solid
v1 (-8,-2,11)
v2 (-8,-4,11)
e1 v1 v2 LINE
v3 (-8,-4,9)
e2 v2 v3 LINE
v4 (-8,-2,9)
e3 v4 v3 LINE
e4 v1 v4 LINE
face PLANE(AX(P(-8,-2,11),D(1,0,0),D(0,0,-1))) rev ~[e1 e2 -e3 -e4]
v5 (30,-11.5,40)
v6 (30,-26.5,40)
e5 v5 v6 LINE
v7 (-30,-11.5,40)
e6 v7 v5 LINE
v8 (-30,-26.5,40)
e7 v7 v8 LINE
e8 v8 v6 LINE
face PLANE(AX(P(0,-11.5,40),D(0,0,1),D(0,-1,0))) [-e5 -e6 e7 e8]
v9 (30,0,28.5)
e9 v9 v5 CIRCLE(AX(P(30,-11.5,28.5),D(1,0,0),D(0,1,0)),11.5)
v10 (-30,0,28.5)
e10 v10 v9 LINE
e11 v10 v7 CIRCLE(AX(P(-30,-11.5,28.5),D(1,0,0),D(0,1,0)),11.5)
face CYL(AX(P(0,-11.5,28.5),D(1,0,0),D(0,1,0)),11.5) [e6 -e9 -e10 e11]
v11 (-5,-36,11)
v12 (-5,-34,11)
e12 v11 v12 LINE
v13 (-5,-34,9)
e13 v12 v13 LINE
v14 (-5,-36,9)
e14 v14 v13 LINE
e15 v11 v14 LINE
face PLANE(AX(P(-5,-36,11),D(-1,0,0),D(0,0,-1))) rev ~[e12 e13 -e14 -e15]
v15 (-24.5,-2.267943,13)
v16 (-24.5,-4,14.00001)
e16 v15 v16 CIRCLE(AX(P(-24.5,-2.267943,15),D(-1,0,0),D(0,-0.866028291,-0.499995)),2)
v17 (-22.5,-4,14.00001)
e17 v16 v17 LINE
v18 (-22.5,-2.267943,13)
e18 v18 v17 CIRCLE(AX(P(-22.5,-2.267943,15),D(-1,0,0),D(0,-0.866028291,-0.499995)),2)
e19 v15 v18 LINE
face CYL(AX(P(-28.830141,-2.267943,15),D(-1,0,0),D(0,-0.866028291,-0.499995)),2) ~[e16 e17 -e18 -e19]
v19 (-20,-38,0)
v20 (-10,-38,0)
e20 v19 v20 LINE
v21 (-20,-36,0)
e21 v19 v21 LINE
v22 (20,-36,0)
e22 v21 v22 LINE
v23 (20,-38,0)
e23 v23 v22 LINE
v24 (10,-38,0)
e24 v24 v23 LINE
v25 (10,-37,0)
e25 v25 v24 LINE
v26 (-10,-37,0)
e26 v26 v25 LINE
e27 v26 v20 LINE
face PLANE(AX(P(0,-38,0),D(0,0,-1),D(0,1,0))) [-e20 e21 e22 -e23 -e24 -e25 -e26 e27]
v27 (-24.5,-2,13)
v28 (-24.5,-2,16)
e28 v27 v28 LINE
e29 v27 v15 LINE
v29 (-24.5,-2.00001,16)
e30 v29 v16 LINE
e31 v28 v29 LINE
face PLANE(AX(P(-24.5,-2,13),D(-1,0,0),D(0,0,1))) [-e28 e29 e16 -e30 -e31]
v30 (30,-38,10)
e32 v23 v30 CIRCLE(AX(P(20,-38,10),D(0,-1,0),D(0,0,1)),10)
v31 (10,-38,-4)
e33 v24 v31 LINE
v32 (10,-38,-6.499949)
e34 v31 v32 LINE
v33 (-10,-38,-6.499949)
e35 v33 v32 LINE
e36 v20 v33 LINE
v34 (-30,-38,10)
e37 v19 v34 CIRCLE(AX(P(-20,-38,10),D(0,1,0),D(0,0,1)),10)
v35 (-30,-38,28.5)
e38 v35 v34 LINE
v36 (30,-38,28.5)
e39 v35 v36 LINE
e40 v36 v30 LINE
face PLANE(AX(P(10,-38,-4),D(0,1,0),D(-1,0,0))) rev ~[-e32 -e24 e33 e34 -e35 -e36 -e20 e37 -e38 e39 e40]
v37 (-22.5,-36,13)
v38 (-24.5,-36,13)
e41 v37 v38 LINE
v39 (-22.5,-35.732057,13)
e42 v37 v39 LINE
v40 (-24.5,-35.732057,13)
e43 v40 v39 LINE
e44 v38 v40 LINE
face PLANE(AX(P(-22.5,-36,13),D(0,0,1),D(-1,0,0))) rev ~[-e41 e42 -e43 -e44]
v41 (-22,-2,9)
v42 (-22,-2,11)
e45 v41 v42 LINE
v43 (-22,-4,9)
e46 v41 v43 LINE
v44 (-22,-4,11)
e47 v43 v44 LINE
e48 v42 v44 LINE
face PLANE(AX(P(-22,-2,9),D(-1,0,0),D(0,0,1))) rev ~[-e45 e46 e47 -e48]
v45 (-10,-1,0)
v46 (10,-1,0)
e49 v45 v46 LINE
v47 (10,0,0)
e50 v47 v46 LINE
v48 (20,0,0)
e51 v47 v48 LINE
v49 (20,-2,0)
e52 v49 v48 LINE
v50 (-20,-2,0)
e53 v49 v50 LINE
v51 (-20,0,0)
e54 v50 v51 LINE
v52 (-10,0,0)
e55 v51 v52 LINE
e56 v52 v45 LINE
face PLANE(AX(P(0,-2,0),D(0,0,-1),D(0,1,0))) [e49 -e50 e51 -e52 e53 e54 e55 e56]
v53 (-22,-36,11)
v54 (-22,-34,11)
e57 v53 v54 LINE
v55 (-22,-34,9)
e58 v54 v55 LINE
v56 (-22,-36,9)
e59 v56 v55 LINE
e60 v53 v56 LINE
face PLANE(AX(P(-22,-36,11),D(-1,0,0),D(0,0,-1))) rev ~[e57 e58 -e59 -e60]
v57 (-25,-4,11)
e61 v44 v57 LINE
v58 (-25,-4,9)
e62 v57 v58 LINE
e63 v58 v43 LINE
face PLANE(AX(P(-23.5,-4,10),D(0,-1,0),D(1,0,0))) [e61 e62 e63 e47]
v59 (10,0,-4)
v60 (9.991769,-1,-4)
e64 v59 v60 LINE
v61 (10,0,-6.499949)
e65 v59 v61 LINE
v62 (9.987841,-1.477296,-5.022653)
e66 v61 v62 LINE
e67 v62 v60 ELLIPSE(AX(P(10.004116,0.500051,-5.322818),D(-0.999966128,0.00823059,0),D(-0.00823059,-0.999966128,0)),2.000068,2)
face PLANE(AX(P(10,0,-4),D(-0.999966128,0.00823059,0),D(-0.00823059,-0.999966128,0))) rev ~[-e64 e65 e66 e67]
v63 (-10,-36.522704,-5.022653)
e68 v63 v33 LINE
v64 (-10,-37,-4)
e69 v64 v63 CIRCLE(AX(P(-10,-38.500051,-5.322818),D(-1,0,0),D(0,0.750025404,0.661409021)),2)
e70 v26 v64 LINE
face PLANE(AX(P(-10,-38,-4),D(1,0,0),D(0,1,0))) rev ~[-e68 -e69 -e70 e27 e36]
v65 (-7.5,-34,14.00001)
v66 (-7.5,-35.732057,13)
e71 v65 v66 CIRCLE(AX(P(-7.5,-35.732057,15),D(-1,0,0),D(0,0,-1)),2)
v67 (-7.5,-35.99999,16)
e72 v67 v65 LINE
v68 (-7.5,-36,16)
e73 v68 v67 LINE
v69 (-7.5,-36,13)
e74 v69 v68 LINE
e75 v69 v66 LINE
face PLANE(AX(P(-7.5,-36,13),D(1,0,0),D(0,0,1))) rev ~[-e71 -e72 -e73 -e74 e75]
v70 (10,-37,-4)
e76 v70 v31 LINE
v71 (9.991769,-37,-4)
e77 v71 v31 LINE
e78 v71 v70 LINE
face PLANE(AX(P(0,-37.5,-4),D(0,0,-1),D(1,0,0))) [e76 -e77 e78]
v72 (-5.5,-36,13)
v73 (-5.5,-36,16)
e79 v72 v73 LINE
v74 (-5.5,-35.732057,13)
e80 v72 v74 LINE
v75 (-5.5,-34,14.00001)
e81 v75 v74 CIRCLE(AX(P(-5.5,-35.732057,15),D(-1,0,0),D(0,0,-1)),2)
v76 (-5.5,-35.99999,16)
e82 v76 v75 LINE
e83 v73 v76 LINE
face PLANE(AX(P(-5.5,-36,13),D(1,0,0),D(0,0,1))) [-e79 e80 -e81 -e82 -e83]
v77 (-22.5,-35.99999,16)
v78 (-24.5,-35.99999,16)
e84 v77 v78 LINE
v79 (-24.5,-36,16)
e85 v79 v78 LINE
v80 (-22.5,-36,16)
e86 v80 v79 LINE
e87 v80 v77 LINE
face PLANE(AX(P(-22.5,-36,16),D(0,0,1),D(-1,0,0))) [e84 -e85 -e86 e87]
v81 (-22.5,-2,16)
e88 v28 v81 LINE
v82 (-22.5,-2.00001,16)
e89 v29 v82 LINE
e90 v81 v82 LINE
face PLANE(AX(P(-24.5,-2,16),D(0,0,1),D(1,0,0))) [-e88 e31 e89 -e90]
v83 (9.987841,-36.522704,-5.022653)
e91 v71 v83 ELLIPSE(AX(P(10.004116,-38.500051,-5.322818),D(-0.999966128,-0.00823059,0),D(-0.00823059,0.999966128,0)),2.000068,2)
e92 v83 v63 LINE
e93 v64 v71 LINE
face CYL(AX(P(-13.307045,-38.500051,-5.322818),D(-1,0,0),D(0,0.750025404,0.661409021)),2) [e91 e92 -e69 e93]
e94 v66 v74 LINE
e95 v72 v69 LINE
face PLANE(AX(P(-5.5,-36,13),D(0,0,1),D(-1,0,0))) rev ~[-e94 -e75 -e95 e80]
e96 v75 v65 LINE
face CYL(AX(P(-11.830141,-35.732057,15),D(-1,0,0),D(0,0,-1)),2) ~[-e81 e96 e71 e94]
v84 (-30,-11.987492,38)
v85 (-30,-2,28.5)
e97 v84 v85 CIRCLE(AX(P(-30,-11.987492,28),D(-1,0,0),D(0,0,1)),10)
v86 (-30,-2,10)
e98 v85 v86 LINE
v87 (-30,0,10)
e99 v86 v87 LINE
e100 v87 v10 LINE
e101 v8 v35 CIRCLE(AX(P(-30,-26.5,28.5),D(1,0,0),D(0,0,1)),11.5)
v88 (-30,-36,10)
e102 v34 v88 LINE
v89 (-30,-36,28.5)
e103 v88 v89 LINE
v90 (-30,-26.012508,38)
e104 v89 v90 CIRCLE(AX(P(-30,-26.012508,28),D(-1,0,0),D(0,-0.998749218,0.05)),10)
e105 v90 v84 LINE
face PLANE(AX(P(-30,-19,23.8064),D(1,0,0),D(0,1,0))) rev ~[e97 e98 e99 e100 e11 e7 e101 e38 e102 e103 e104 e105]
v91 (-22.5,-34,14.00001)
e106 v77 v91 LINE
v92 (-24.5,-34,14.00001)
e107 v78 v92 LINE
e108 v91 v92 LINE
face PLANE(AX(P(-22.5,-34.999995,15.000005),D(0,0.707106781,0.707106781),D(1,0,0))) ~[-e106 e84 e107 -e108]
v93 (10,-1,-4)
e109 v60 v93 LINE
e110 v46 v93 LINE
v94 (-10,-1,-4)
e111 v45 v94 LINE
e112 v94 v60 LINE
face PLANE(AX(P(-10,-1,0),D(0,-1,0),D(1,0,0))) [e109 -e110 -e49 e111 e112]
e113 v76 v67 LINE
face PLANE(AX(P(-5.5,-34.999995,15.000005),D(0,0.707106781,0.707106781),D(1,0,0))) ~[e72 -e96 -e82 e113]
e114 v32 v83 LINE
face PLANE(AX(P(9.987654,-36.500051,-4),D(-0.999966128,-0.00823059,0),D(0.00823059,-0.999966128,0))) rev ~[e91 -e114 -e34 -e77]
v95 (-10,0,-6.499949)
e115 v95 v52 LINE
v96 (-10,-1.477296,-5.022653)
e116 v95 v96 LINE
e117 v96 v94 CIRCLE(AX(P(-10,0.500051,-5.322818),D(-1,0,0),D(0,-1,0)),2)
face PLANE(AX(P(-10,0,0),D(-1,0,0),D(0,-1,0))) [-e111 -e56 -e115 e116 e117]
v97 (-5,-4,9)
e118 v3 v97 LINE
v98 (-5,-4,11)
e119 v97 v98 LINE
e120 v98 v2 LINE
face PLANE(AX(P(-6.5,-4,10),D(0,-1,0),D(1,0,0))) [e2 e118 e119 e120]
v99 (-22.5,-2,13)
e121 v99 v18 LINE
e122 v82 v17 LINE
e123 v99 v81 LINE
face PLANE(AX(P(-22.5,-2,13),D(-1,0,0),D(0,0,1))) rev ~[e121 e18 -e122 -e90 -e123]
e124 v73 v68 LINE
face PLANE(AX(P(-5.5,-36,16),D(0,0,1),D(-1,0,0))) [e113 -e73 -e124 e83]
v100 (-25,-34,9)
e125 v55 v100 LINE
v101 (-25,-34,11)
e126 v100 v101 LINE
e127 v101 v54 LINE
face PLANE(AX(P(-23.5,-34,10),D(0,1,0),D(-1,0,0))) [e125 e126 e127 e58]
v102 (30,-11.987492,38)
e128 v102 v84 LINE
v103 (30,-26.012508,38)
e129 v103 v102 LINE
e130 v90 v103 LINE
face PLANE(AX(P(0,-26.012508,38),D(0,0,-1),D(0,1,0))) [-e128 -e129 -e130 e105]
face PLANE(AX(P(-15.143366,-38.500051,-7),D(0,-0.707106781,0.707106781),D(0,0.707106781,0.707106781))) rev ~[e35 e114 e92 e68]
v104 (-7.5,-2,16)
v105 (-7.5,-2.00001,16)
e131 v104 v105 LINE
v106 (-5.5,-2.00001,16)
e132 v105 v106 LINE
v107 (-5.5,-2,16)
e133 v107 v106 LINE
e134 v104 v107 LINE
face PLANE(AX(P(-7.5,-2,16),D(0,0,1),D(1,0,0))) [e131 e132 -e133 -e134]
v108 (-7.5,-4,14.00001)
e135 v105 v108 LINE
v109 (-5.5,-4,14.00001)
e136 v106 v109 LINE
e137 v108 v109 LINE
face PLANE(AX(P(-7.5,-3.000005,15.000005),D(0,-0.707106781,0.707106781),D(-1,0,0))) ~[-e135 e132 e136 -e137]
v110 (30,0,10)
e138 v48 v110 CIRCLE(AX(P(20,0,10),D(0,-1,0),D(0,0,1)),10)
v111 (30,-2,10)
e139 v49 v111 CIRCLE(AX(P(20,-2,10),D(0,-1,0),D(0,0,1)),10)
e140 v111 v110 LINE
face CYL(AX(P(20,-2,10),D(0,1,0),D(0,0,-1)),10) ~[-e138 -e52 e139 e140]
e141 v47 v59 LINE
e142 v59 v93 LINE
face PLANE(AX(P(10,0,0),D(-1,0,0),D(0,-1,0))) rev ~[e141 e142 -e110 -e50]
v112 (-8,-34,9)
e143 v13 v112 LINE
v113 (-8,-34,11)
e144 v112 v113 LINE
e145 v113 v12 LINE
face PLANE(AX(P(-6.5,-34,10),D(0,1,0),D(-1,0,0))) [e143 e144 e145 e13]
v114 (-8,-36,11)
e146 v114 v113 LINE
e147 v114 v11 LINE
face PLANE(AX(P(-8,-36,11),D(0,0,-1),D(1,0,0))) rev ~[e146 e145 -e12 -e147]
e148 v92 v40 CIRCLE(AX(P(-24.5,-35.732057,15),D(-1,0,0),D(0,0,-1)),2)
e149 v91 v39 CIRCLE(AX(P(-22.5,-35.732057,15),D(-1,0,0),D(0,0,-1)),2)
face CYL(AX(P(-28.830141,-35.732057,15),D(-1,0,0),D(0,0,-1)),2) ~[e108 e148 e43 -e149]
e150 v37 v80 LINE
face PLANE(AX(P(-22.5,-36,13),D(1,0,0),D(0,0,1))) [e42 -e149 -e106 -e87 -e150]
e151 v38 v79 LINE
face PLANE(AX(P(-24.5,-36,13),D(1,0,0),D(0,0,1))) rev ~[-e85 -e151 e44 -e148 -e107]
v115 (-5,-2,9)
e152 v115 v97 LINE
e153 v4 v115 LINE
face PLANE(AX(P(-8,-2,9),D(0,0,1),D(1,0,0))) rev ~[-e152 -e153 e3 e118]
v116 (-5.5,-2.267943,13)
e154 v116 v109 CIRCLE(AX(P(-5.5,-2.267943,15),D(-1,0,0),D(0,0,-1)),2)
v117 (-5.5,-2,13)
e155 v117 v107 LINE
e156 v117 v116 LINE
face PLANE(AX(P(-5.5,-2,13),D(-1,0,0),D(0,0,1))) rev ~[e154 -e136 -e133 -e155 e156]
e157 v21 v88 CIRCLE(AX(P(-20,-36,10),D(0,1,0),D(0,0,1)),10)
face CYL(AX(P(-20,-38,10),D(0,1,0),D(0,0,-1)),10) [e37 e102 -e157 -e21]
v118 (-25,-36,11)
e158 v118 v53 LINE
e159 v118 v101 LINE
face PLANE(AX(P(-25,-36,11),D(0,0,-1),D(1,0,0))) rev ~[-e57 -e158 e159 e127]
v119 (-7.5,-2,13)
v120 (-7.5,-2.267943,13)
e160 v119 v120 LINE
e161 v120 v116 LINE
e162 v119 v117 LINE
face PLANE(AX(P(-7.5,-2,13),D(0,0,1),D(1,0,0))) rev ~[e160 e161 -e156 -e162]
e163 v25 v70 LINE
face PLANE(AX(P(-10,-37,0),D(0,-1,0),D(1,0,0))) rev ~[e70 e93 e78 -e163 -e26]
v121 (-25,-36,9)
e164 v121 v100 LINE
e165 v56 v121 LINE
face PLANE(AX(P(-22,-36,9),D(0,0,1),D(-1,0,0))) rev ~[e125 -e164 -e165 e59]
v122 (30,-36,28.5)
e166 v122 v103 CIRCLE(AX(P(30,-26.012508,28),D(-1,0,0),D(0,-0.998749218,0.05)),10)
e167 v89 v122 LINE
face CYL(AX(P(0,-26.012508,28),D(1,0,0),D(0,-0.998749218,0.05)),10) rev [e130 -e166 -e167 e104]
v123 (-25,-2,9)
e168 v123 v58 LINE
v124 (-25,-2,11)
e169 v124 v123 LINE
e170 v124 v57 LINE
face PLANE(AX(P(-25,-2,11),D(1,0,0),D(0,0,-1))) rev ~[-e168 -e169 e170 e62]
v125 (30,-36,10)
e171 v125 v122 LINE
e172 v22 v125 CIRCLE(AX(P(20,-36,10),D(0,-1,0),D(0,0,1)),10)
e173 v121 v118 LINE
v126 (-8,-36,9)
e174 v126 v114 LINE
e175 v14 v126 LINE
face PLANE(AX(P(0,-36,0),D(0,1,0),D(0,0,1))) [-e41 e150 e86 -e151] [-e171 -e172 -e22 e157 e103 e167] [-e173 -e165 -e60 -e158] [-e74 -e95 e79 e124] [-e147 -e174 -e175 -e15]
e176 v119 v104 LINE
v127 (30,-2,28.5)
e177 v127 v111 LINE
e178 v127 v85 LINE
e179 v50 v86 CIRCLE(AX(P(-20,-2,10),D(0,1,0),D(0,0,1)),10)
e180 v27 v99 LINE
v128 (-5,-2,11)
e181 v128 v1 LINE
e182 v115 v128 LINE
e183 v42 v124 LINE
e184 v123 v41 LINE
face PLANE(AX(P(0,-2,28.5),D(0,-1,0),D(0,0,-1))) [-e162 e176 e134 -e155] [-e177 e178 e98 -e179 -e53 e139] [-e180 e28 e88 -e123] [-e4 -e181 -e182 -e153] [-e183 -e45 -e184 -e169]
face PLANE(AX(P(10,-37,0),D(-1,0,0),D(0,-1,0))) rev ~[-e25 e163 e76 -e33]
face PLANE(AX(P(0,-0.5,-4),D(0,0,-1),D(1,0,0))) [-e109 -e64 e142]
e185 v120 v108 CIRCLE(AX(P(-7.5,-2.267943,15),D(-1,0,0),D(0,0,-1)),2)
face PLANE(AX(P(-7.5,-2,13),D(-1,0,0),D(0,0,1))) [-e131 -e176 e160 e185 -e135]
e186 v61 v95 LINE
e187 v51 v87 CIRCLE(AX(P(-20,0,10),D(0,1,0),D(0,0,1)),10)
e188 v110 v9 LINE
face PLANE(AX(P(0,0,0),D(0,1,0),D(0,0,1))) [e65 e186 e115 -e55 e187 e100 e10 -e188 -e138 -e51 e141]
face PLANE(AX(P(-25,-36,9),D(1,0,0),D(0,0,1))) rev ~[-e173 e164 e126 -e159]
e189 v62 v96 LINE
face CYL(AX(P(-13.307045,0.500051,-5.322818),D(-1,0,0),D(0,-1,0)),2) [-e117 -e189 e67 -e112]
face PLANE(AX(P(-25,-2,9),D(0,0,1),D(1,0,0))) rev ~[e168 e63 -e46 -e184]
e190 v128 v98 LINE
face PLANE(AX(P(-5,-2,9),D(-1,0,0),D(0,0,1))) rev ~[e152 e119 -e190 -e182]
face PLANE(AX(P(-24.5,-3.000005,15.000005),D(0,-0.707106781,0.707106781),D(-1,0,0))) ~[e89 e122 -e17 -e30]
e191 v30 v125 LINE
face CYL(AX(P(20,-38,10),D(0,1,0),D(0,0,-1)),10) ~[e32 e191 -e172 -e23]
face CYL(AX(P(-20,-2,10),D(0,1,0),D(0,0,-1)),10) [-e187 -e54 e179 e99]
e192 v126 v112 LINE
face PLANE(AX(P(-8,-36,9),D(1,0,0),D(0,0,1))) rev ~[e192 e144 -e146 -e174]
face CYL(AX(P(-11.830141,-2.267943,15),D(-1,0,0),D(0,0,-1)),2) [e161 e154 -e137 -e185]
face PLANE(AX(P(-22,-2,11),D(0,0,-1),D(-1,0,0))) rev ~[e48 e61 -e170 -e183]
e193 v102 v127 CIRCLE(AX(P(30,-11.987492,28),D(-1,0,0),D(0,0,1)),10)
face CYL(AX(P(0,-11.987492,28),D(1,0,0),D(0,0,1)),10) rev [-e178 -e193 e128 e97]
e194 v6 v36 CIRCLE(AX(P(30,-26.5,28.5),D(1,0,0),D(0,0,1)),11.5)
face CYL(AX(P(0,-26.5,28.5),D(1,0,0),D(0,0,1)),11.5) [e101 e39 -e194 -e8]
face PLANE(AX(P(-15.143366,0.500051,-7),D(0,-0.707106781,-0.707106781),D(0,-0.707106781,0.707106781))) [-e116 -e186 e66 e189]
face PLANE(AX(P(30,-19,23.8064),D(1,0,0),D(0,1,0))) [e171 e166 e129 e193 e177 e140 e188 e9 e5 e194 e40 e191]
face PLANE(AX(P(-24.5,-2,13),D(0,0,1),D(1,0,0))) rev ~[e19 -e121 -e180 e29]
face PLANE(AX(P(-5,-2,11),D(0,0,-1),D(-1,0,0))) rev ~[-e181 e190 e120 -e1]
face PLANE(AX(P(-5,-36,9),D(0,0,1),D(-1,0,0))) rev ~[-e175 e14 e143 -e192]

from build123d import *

# Parameters (mm, degrees)
F1_DEPTH     = 30
F2_R         = 10
F3_W         = 20
F3_H         = 1
F4_DEPTH     = 4
F6_DEPTH     = 3
F7_T1_DEPTH  = 26.6017443282
F8_T1_DEPTH  = 30.2743860668
F9_W         = 2
F9_H         = 3
F11_DEPTH    = 2
F10_W        = 2
F10_H        = 3
F12_DEPTH    = 2
F13_SIZE     = 1.99999
F14_T1_DEPTH = 10.6602829052
F14_T3_DEPTH = 10.6602829052


# Not quite as in the source:
# - a fillet or chamfer that OpenCascade refuses, or shapes differently, is made with other operations: its cross-section is extruded or revolved along the edge and cut away or added
# - a fillet or chamfer is up to 0.001 mm smaller than in the source, because OpenCascade refuses the exact size


with BuildPart() as f1:
    # F0 (on Right) → F1 (new body, symmetric)
    with BuildSketch(Plane.YZ):
        with BuildLine():
            Line((-2, 0), (0, 0))
            Line((0, 0), (0, 28.5))
            ThreePointArc((0, 28.5), (-3.3682720164, 36.6317279836), (-11.5, 40))
            Line((-11.5, 40), (-26.5, 40))
            ThreePointArc((-26.5, 40), (-34.6317279836, 36.6317279836), (-38, 28.5))
            Line((-38, 28.5), (-38, 0))
            Line((-38, 0), (-36, 0))
            Line((-36, 0), (-36, 28.5))
            ThreePointArc((-36, 28.5), (-32.9045321983, 35.2456883731), (-26.0125078223, 38))
            Line((-26.0125078223, 38), (-11.9874921777, 38))
            ThreePointArc((-11.9874921777, 38), (-5.0954678017, 35.2456883731), (-2, 28.5))
            Line((-2, 28.5), (-2, 0))
        make_face()
    extrude(amount=F1_DEPTH, both=True)

    # F2
    f2_edges = [f1.edges().sort_by_distance(p)[0] for p in [
        (30, -37, 0),
        (30, -1, 0),
        (-30, -1, 0),
        (-30, -37, 0),
    ]]
    fillet(f2_edges, radius=F2_R)

    # F3 (on face) → F4 (join)
    with BuildSketch(Plane(origin=(0, 0, 0), x_dir=(1, 0, 0), z_dir=(0, 0, -1))):
        with Locations((0, 0.5)):
            Rectangle(F3_W, F3_H)
        with Locations((0, 37.5)):
            Rectangle(F3_W, F3_H)
    extrude(amount=F4_DEPTH)

    # F5 (on face) → F6 (join)
    with BuildSketch(Plane(origin=(0, 0, -4), x_dir=(1, 0, 0), z_dir=(0, 0, -1))):
        Polygon((10, 38), (-10, 38), (-10, 36.5000508078), (9.987654115, 36.5000508078), align=None)
        Polygon((-10, 1.4999491922), (-10, 0), (10, 0), (9.987654115, 1.4999491922), align=None)
    extrude(amount=F6_DEPTH)

    # F7: fillet of radius 2 on 2 edges, made by hand

    # F7_s2 → F7_t1 (cut)
    with BuildSketch(Plane.YZ.offset(-13.3070451066)):
        with BuildLine():
            ThreePointArc((-1.4999491922, -5.3228180426), (-1.3707914645, -4.6157471889), (-1, -4))
            Line((-1, -4), (-1.4999491922, -4))
            Line((-1.4999491922, -4), (-1.4999491922, -5.3228180426))
        make_face()
        with BuildLine():
            ThreePointArc((-37, -4), (-36.6292085355, -4.6157471889), (-36.5000508078, -5.3228180426))
            Line((-36.5000508078, -5.3228180426), (-36.5000508078, -4))
            Line((-36.5000508078, -4), (-37, -4))
        make_face()
    extrude(amount=F7_T1_DEPTH, mode=Mode.SUBTRACT)

    # F8: chamfer of 2 on 2 edges, made by hand

    # F8_s2 → F8_t1 (cut)
    with BuildSketch(Plane.YZ.offset(-15.1433659759)):
        Polygon((0.5000508078, -7), (-1.4999491922, -5), (-1.4999491922, -7), align=None)
        Polygon((-38.5000508078, -7), (-36.5000508078, -5), (-36.5000508078, -7), align=None)
    extrude(amount=F8_T1_DEPTH, mode=Mode.SUBTRACT)

    # F9 (on face) → F11 (join)
    with BuildSketch(Plane.XZ.offset(2)):
        Polygon((-25, 11), (-25, 10), (-25, 9), (-22, 9), (-22, 11), align=None)
        with Locations((-23.5, 14.5)):
            Rectangle(F9_W, F9_H)
        Polygon((-5, 9), (-5, 10), (-5, 11), (-8, 11), (-8, 9), align=None)
        with Locations((-6.5, 14.5)):
            Rectangle(F9_W, F9_H)
    extrude(amount=F11_DEPTH)

    # F10 (on face) → F12 (join)
    with BuildSketch(Plane(origin=(0, -36, 0), x_dir=(-1, 0, 0), z_dir=(0, 1, 0))):
        Polygon((22, 11), (22, 10), (22, 9), (25, 9), (25, 11), align=None)
        with Locations((23.5, 14.5)):
            Rectangle(F10_W, F10_H)
        Polygon((8, 9), (8, 10), (8, 11), (5, 11), (5, 9), align=None)
        with Locations((6.5, 14.5)):
            Rectangle(F10_W, F10_H)
    extrude(amount=F12_DEPTH)

    # F13 (size 2 in the source; OpenCascade refuses exactly that, so slightly less here)
    f13_edges = [f1.edges().sort_by_distance(p)[0] for p in [
        (-23.5, -4, 16),
        (-23.5, -34, 16),
        (-6.5, -4, 16),
        (-6.5, -34, 16),
    ]]
    chamfer(f13_edges, length=F13_SIZE)

    # F14: fillet of radius 2 on 4 edges, made by hand

    # F14_s2 → F14_t1 (cut)
    with BuildSketch(Plane.YZ.offset(-28.8301414526)):
        with BuildLine():
            ThreePointArc((-4, 14.00001), (-3.267948419, 13.2679520792), (-2.267943419, 13))
            Line((-2.267943419, 13), (-4, 13))
            Line((-4, 13), (-4, 14.00001))
        make_face()
        with BuildLine():
            ThreePointArc((-35.732056581, 13), (-34.732051581, 13.2679520792), (-34, 14.00001))
            Line((-34, 14.00001), (-34, 13))
            Line((-34, 13), (-35.732056581, 13))
        make_face()
    extrude(amount=F14_T1_DEPTH, mode=Mode.SUBTRACT)

    # F14_s4 → F14_t3 (cut)
    with BuildSketch(Plane.YZ.offset(-11.8301414526)):
        with BuildLine():
            ThreePointArc((-2.267943419, 13), (-3.267948419, 13.2679520792), (-4, 14.00001))
            Line((-4, 14.00001), (-4, 13))
            Line((-4, 13), (-2.267943419, 13))
        make_face()
        with BuildLine():
            ThreePointArc((-35.732056581, 13), (-34.732051581, 13.2679520792), (-34, 14.00001))
            Line((-34, 14.00001), (-34, 13))
            Line((-34, 13), (-35.732056581, 13))
        make_face()
    extrude(amount=F14_T3_DEPTH, mode=Mode.SUBTRACT)


solid = f1.part
